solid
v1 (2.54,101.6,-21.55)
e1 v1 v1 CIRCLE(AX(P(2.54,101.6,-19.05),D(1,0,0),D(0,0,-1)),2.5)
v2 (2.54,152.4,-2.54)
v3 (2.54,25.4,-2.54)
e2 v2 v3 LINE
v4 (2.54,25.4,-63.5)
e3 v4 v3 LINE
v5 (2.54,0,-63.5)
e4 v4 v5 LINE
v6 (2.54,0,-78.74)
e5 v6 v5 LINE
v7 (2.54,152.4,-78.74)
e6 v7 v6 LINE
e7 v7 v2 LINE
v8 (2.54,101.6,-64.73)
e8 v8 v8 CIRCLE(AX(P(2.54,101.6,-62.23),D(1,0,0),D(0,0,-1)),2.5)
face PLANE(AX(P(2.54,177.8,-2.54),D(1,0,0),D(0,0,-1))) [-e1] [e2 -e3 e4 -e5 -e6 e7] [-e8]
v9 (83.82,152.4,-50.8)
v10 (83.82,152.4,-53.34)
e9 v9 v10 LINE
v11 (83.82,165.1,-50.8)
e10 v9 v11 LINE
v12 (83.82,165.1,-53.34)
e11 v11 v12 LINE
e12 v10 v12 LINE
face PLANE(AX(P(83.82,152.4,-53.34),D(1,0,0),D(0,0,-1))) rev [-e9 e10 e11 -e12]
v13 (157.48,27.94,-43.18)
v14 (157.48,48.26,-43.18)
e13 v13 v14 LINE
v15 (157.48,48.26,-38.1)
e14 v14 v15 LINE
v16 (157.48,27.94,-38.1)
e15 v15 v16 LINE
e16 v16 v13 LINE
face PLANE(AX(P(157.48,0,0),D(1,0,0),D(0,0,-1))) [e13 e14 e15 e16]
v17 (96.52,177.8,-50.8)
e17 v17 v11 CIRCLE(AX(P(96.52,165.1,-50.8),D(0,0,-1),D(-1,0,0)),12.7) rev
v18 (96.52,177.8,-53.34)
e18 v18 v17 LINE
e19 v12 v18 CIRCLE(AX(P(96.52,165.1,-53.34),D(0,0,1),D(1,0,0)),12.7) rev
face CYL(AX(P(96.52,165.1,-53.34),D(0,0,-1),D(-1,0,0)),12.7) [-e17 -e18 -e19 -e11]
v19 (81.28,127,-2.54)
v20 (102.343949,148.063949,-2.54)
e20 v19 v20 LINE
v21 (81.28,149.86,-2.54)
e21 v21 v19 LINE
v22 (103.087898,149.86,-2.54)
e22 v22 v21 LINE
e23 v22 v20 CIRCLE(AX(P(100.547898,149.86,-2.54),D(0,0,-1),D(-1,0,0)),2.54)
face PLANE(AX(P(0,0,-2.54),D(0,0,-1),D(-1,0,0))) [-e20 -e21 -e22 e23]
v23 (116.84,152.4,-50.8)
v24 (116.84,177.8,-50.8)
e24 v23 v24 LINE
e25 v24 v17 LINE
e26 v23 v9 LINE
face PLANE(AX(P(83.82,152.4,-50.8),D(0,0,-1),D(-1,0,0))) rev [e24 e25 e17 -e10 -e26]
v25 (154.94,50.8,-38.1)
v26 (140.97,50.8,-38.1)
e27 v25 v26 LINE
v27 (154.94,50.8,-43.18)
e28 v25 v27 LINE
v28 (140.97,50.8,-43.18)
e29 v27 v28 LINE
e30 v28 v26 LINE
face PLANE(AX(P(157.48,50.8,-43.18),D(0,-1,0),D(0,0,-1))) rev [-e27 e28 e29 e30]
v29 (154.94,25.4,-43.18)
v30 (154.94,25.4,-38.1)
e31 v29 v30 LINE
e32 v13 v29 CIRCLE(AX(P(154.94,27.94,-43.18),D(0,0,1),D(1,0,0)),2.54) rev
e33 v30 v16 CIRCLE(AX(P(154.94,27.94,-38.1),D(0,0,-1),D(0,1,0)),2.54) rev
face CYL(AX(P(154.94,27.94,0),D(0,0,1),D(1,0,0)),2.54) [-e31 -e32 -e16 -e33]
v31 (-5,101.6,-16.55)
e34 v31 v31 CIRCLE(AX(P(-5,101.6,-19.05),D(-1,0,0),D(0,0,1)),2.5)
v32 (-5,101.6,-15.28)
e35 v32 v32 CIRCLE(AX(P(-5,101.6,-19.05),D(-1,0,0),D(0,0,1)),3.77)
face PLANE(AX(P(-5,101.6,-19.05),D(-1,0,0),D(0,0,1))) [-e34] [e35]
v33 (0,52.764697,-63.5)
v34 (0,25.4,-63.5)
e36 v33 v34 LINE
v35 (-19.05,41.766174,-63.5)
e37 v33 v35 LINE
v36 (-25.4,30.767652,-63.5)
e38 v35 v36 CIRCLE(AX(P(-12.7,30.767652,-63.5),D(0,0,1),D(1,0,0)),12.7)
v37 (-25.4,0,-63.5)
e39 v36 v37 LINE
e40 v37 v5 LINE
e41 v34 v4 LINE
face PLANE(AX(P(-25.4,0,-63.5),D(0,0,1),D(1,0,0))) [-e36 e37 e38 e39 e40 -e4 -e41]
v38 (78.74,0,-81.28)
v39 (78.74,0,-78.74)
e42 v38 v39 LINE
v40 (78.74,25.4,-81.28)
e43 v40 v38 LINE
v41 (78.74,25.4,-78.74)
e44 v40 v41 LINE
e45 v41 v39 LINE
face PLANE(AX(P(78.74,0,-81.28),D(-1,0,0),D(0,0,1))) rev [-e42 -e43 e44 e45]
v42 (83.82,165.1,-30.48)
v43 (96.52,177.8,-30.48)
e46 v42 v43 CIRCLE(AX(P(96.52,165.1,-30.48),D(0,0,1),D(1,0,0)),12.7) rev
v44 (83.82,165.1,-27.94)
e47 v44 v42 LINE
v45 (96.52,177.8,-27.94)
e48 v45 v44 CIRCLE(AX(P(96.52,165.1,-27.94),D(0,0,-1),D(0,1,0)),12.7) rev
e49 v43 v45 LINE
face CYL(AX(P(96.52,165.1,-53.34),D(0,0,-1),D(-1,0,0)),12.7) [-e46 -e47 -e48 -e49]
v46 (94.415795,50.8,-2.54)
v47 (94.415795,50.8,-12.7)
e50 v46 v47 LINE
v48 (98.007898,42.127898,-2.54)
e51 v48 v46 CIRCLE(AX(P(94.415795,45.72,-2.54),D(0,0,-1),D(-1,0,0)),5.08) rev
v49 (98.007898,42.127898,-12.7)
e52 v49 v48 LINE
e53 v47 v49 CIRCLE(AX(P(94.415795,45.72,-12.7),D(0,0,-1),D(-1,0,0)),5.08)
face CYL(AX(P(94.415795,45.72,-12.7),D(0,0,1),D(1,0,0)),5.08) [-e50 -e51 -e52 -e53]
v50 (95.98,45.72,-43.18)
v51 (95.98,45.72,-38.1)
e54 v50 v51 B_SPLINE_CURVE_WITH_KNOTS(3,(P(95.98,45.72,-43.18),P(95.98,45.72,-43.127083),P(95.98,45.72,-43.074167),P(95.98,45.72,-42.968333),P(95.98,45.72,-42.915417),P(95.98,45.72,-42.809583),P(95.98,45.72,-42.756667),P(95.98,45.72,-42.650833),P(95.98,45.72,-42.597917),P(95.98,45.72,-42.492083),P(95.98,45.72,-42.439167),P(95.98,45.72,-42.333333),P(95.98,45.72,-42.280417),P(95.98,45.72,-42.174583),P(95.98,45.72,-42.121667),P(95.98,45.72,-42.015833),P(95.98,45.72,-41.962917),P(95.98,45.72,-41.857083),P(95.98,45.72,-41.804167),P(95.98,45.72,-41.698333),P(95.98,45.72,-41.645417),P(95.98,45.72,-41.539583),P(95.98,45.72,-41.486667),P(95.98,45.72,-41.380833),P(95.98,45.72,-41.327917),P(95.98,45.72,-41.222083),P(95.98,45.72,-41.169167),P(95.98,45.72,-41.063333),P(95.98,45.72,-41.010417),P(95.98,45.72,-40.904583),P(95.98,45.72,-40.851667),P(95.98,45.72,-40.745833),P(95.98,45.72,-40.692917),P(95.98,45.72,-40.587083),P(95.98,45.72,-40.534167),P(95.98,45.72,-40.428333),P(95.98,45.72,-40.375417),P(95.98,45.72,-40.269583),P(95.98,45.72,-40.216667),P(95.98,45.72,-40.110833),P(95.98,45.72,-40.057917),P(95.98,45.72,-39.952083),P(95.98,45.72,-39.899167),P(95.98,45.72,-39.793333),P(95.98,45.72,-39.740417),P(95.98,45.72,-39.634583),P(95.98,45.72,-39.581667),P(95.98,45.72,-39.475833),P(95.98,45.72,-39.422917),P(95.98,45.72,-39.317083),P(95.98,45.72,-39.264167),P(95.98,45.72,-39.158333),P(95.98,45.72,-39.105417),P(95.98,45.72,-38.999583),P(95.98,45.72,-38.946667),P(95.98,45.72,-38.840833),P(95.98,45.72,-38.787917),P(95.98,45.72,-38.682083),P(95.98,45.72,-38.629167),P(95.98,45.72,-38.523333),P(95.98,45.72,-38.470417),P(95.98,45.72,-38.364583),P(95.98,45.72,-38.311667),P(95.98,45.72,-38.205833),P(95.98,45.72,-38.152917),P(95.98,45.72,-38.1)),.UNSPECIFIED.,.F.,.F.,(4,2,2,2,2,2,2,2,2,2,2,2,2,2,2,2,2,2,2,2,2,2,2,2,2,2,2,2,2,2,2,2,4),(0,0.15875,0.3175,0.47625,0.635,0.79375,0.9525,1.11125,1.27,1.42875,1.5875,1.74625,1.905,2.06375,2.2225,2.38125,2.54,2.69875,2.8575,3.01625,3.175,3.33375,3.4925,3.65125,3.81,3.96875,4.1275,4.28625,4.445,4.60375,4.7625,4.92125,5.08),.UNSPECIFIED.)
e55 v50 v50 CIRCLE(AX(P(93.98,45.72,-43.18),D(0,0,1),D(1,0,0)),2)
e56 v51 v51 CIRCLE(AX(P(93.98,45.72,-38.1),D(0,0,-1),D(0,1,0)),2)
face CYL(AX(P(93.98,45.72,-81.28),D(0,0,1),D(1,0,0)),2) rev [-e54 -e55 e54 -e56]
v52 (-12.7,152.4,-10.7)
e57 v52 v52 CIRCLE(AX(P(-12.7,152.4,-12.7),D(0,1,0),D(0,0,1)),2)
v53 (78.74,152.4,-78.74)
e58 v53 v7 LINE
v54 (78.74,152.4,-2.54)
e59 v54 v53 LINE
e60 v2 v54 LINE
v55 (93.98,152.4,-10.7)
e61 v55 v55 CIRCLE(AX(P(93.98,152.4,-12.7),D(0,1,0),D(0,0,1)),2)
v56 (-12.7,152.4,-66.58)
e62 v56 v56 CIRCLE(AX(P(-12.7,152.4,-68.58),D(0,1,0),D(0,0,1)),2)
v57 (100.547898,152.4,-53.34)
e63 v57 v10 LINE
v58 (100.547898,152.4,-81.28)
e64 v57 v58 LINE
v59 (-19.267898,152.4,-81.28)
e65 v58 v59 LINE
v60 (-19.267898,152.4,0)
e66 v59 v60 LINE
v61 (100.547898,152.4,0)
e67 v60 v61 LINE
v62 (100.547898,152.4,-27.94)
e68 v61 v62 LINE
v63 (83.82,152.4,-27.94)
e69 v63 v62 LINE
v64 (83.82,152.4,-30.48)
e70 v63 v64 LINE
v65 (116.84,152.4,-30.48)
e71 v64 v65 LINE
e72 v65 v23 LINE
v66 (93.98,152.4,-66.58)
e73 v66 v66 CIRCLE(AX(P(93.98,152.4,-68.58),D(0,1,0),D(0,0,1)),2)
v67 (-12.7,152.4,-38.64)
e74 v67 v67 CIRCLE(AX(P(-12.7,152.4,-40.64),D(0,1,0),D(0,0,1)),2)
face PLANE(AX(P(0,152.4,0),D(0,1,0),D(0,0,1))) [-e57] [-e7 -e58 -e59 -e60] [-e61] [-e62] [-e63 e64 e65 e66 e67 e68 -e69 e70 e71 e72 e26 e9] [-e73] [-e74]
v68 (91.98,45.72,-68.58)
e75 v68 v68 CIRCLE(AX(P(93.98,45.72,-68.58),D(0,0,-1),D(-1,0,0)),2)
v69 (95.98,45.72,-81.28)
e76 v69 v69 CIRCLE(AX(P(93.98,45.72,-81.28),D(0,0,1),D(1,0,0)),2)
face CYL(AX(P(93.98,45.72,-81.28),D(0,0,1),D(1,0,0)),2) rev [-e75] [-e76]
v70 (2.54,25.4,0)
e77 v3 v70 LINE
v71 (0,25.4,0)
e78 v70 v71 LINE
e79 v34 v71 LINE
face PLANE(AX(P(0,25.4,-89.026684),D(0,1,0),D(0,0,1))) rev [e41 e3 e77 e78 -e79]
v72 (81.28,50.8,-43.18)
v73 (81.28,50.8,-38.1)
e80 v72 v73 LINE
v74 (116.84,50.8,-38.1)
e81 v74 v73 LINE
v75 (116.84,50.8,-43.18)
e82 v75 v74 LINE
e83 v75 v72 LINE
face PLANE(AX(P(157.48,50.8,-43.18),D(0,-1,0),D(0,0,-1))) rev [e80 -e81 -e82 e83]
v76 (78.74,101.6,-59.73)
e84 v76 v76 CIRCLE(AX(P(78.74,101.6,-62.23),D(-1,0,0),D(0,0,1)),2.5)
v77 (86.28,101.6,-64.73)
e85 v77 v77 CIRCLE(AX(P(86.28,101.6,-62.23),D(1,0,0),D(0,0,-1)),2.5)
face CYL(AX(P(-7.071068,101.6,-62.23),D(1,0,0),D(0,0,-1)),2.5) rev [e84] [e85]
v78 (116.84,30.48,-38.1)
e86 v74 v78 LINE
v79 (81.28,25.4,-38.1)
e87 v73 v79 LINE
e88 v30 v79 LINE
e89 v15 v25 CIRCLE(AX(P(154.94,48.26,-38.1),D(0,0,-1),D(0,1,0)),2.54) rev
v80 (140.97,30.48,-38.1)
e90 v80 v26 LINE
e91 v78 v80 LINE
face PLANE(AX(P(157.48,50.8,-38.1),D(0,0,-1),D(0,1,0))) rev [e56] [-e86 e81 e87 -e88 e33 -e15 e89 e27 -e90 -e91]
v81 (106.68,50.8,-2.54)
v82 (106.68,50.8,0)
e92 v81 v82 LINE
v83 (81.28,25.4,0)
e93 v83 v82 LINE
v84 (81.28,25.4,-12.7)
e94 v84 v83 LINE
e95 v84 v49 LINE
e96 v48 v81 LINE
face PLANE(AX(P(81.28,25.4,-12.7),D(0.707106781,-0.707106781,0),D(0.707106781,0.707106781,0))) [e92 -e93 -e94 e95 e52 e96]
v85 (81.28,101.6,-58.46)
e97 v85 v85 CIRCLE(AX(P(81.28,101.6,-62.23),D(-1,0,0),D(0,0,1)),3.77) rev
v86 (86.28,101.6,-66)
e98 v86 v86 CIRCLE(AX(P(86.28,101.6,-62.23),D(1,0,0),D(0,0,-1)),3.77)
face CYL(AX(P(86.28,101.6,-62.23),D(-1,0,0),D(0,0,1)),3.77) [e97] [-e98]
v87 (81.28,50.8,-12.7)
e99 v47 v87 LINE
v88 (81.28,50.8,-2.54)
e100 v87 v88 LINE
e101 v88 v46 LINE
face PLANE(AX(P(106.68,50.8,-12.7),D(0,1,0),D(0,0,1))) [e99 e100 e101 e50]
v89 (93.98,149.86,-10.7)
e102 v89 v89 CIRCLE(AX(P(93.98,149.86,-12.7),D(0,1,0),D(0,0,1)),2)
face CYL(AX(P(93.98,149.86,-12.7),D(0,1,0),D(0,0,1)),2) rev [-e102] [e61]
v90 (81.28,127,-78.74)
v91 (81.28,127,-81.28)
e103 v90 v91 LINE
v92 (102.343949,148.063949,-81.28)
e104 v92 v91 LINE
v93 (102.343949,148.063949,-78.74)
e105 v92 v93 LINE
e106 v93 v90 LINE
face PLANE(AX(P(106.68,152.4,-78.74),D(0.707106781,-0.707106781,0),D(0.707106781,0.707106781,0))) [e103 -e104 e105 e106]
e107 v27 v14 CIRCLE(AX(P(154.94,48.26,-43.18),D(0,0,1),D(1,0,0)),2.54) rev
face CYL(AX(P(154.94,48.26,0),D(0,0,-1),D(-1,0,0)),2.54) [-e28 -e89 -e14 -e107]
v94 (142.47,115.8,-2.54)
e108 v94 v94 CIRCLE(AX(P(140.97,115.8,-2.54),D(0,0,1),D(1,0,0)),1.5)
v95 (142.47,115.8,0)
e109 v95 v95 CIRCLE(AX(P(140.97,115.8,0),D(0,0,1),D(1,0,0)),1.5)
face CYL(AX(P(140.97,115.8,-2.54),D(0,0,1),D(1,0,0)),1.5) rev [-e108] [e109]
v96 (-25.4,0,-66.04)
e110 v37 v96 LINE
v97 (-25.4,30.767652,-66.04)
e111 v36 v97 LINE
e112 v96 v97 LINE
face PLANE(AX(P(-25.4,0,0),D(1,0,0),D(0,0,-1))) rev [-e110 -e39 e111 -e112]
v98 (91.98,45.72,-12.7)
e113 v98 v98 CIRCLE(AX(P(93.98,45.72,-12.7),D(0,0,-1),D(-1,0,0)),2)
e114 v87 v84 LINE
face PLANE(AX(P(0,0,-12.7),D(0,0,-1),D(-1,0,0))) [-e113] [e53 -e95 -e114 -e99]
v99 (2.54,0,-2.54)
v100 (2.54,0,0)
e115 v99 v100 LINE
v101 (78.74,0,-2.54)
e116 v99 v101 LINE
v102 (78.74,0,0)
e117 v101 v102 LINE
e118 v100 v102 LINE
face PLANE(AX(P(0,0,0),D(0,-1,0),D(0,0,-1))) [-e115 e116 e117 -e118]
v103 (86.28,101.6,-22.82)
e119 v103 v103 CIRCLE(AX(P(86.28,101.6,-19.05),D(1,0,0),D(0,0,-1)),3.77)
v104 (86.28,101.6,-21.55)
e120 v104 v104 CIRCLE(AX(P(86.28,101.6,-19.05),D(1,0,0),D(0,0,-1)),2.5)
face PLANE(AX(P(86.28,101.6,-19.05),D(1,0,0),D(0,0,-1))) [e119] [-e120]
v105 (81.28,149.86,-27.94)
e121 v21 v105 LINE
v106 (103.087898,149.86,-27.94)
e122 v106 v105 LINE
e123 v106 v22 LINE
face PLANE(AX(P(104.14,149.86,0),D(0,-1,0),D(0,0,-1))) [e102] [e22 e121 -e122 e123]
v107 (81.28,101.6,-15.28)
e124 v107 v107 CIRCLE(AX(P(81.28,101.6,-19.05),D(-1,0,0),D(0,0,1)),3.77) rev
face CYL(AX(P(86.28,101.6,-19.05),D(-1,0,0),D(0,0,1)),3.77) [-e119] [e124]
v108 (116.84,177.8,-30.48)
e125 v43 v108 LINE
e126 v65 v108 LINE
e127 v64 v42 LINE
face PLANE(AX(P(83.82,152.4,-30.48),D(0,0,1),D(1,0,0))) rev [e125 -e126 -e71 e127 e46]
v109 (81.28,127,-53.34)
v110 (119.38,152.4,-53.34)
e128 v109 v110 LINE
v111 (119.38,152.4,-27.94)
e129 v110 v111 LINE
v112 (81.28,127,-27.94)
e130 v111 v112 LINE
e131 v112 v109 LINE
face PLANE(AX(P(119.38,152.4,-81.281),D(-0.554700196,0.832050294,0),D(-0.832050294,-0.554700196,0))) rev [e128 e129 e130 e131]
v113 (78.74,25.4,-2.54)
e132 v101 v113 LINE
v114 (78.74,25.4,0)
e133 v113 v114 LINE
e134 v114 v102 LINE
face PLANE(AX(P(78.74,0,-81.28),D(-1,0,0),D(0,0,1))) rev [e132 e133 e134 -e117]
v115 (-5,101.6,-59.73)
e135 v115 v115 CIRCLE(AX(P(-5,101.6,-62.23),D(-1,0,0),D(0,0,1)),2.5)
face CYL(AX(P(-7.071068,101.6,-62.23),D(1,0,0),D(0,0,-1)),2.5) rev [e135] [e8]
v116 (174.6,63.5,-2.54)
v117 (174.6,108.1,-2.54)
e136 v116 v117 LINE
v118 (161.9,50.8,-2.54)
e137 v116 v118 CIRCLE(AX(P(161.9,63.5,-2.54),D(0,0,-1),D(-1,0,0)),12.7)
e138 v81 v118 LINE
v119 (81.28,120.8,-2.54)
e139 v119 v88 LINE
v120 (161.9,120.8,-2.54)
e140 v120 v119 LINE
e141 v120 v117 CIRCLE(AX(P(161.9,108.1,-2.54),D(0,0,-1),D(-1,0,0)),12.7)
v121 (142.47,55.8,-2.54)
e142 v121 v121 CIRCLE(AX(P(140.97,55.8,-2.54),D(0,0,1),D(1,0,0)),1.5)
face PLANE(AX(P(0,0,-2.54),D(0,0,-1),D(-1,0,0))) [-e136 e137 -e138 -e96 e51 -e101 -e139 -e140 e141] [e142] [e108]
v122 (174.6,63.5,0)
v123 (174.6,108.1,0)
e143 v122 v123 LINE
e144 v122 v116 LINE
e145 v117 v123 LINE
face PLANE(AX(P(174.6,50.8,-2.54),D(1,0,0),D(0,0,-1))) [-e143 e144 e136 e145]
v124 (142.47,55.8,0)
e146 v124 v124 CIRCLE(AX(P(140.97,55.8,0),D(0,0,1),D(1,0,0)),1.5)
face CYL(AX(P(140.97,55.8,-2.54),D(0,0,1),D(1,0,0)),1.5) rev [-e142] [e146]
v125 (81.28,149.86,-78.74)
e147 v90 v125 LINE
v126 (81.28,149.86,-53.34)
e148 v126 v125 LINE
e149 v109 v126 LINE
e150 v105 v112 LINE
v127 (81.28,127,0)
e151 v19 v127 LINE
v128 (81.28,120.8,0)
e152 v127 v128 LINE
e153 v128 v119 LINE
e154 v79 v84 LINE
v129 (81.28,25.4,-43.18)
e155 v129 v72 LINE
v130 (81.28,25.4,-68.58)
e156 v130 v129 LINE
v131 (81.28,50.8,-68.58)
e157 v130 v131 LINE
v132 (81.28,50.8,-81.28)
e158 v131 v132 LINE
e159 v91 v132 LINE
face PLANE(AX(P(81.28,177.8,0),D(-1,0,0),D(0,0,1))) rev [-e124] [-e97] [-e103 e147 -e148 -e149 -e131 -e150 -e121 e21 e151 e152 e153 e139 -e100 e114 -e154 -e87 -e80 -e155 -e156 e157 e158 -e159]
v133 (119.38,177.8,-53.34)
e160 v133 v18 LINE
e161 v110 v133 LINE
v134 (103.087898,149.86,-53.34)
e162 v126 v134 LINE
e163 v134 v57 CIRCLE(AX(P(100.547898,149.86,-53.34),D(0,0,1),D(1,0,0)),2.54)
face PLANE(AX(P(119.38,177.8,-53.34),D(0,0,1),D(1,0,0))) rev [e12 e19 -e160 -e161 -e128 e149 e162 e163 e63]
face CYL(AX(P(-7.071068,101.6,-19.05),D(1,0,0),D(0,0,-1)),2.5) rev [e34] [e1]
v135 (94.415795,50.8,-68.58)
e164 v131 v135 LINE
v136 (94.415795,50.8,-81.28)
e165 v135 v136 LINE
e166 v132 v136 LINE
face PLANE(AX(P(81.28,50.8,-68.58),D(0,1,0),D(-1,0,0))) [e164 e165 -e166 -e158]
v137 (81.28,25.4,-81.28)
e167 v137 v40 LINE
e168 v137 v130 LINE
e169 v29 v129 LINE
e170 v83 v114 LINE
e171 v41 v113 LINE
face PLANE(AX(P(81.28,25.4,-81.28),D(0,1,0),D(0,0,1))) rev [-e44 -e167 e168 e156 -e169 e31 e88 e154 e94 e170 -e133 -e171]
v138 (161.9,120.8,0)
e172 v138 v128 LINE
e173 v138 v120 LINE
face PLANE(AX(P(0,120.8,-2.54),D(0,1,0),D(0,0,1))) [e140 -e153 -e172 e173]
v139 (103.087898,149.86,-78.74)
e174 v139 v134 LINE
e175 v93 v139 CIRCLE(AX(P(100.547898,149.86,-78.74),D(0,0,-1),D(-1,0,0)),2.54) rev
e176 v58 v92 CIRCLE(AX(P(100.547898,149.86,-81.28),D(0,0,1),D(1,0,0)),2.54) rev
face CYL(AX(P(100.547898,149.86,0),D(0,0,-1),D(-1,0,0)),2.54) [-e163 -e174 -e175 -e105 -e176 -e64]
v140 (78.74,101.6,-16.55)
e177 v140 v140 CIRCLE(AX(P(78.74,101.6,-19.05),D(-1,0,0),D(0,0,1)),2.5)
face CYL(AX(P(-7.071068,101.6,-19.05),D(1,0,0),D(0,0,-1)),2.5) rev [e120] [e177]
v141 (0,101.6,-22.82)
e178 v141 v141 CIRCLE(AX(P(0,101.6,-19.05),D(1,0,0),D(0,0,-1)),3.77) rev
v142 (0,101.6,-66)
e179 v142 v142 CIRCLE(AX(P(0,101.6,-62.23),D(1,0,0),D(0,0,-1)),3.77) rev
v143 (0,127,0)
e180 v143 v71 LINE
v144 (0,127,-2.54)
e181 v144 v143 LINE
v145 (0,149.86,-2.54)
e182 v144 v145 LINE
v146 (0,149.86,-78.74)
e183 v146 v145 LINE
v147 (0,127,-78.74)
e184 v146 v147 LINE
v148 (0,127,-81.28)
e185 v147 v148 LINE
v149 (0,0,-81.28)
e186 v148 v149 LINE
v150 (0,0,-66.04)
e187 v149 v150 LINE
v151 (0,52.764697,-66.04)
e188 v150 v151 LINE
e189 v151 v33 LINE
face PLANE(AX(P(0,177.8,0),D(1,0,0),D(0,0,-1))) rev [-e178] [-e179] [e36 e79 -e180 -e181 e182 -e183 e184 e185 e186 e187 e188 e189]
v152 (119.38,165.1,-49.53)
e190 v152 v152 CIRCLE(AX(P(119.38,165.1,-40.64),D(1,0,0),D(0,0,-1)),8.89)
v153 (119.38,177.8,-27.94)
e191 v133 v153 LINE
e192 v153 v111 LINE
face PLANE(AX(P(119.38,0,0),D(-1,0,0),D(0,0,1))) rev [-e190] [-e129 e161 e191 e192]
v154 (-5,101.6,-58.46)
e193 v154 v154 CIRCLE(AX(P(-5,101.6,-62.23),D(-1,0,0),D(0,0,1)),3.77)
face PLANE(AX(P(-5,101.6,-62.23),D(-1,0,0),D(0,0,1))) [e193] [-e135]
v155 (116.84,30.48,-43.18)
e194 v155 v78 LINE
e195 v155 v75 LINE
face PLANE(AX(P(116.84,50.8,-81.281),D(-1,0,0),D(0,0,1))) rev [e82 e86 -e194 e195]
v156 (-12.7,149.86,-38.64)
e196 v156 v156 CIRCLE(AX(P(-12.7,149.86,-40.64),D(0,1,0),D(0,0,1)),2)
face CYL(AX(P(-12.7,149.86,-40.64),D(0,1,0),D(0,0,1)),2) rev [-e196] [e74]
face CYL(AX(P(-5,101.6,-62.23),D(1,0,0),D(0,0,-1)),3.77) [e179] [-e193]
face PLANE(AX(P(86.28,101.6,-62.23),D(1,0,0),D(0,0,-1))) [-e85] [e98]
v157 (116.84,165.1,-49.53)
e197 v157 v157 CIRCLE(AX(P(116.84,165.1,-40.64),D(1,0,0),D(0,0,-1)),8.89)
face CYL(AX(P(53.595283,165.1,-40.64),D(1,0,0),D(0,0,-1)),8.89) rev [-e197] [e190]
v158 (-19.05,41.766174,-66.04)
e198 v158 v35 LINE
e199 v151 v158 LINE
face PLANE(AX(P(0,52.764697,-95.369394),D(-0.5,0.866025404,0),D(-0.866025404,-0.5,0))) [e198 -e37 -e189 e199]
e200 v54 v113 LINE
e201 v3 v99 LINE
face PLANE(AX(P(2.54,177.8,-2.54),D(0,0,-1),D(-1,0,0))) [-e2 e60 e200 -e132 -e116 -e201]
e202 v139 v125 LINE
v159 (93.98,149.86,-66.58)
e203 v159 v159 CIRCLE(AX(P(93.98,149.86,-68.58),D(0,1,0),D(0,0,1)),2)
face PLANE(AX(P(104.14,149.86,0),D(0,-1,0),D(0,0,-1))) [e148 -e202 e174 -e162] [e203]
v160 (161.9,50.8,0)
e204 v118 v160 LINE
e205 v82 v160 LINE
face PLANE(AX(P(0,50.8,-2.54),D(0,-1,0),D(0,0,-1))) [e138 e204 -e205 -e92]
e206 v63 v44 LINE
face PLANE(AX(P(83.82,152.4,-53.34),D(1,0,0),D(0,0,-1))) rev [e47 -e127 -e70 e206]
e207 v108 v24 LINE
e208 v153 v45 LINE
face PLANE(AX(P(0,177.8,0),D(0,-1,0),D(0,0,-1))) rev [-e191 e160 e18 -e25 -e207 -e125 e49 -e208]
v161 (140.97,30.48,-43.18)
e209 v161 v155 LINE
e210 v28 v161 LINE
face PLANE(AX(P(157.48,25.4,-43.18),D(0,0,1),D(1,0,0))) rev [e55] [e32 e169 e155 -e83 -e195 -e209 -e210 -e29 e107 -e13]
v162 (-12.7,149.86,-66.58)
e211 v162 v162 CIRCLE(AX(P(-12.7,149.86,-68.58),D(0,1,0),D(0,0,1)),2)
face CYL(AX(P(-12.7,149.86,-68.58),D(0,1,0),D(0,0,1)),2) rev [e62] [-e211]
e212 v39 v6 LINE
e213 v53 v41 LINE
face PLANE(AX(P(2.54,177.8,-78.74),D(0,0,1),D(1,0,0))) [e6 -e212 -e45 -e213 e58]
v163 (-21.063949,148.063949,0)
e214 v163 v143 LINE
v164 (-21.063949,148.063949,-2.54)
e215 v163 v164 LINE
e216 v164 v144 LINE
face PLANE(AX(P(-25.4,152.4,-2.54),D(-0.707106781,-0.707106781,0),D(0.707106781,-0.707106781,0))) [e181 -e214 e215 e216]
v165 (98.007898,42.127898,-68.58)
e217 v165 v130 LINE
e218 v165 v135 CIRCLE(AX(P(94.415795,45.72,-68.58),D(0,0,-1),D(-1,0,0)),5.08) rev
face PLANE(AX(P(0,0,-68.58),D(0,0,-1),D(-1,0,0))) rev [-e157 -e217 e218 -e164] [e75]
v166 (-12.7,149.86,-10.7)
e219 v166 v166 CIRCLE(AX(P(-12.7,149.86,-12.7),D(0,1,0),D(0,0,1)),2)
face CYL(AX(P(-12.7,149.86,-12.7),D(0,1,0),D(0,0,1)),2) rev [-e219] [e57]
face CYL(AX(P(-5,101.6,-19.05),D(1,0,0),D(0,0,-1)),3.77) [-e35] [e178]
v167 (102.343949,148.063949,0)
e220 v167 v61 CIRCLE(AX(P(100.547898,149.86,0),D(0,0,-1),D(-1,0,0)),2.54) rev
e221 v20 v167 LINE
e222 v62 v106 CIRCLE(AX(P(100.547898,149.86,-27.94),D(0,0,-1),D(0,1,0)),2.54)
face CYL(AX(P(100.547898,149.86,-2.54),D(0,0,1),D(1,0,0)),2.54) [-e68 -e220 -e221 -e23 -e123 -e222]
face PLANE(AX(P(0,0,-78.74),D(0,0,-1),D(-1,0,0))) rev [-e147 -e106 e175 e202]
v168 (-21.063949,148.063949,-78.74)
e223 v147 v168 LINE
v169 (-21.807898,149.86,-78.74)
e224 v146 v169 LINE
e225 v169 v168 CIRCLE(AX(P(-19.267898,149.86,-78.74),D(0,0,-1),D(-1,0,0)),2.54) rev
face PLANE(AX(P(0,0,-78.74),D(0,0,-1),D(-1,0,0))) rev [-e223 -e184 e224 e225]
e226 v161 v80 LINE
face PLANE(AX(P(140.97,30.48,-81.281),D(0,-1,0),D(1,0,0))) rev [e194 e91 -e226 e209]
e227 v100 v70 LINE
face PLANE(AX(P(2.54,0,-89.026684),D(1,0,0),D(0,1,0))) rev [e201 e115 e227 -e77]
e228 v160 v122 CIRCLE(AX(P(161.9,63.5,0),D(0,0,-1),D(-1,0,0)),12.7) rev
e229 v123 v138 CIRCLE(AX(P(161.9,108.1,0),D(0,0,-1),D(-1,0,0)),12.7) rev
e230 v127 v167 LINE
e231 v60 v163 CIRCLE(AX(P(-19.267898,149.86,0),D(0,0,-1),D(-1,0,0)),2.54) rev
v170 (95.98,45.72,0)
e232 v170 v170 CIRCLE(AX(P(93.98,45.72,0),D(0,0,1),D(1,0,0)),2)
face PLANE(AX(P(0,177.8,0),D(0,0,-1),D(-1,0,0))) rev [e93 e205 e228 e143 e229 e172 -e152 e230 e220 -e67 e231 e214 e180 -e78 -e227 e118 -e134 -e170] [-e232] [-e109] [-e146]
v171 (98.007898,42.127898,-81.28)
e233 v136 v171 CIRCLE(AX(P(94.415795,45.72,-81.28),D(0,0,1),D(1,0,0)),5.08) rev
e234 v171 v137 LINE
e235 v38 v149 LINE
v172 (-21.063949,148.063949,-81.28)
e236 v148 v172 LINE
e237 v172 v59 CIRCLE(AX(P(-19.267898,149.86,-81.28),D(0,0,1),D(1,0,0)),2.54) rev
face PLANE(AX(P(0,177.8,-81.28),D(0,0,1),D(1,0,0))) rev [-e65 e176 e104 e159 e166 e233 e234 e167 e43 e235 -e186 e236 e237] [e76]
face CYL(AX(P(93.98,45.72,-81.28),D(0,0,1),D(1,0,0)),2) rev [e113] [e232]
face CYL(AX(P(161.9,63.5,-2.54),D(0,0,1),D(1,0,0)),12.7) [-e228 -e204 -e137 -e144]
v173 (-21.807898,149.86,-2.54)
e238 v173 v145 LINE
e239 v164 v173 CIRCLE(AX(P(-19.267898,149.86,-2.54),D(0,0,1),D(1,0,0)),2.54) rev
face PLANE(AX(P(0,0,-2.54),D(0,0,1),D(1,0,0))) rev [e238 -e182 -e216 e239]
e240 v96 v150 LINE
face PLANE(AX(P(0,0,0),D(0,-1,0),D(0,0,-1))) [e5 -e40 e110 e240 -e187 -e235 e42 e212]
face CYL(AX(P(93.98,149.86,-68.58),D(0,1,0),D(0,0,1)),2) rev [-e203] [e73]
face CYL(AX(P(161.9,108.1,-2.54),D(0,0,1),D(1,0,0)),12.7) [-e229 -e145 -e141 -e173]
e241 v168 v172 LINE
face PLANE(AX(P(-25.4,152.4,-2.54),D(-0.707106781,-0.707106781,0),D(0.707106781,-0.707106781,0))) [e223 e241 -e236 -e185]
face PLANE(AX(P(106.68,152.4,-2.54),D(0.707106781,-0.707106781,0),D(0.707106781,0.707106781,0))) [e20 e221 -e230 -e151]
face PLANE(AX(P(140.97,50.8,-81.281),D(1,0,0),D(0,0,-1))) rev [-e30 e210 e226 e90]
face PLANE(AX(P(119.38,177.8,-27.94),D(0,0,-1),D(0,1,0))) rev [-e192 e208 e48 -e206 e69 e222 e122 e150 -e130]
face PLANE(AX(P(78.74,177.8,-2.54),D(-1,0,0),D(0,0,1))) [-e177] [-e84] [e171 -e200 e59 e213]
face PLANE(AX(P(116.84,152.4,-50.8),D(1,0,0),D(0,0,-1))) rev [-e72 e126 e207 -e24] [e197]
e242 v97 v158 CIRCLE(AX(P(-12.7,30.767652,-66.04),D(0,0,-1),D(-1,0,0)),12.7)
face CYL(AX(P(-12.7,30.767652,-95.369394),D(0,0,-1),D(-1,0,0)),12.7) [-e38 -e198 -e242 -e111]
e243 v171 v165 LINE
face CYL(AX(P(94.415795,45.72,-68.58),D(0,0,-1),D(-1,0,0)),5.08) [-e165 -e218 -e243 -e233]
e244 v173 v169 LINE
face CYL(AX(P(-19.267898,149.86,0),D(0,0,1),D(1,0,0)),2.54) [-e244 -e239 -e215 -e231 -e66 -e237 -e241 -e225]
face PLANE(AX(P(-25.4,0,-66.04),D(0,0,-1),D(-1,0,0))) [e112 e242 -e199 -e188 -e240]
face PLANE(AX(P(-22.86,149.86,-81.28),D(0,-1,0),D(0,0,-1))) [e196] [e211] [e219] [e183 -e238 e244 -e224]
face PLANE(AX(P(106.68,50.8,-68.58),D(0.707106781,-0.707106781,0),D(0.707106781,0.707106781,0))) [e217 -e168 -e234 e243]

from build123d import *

# Parameters (mm, degrees)
SKETCH1_W            = 81.28
SKETCH1_H            = 81.28
SKETCH1_W_2          = 76.2
SKETCH1_H_2          = 76.2
BOSS_EXTRUDE1_DEPTH  = 177.8
SKETCH2_W            = 2.54
SKETCH2_H            = 38.1
BOSS_EXTRUDE2_DEPTH  = 25.4
SKETCH3_W            = 2.54
SKETCH3_H            = 25.4
CUT_EXTRUDE1_DEPTH   = 212.720846399
BOSS_EXTRUDE3_DEPTH  = 12.7
BOSS_EXTRUDE4_DEPTH  = 12.7
SKETCH14_W           = 5.08
SKETCH14_H           = 25.4
BOSS_EXTRUDE6_DEPTH  = 76.2
CUT_EXTRUDE2_REACH   = 243.407
SKETCH16_W           = 24.13
SKETCH16_H           = 20.32
SKETCH22_R           = 2
CUT_EXTRUDE6_DEPTH   = 252.036309724
SKETCH28_W           = 25.4
SKETCH28_H           = 50.8
BOSS_EXTRUDE7_DEPTH  = 38.1
CUT_EXTRUDE8_REACH   = 245.43
SKETCH32_W           = 33.02
SKETCH32_H           = 20.32
CUT_EXTRUDE9_DEPTH   = 25.4
CUT_EXTRUDE13_REACH  = 245.27
SKETCH34_R           = 8.89
BOSS_EXTRUDE9_DEPTH  = 2.54
SKETCH38_W           = 2.54
SKETCH38_H           = 25.4
CUT_EXTRUDE15_DEPTH  = 63.5
CUT_EXTRUDE17_REACH  = 224.71
SKETCH40_R           = 2.5
BOSS_EXTRUDE10_START = 5
SKETCH41_R           = 3.77
SKETCH41_R_2         = 2.5
BOSS_EXTRUDE10_DEPTH = 5
SKETCH42_R           = 3.77
SKETCH42_R_2         = 2.5
BOSS_EXTRUDE11_DEPTH = 5
SKETCH43_W           = 76.2
SKETCH43_H           = 76.2
CUT_EXTRUDE20_DEPTH  = 25.4
SKETCH44_W           = 174.6
SKETCH44_H           = 70
SKETCH44_R           = 1.5
BOSS_EXTRUDE12_DEPTH = 2.54
BOSS_EXTRUDE13_DEPTH = 2.54
BOSS_EXTRUDE14_DEPTH = 2.54
BOSS_EXTRUDE15_REACH = 264.115
BOSS_EXTRUDE16_DEPTH = 2.54
BOSS_EXTRUDE17_DEPTH = 2.54
BOSS_EXTRUDE18_REACH = 264.115
SKETCH51_R           = 2
CUT_EXTRUDE21_DEPTH  = 2.54
FILLET1_R            = 5.08
FILLET2_R            = 12.7
FILLET3_R            = 2.54
FILLET4_R            = 2.54
FILLET5_R            = 2.54
FILLET7_R            = 12.7
FILLET9_R            = 12.7


with BuildPart() as part:
    # Sketch1 → Boss-Extrude1 (new body)
    with BuildSketch(Plane(origin=(0, 0, 0), x_dir=(1, 0, 0), z_dir=(0, 1, 0))):
        with Locations((40.64, 40.64)):
            Rectangle(SKETCH1_W, SKETCH1_H)
        with Locations((40.64, 40.64)):
            Rectangle(SKETCH1_W_2, SKETCH1_H_2, mode=Mode.SUBTRACT)
    extrude(amount=BOSS_EXTRUDE1_DEPTH)

    # Sketch2 → Boss-Extrude2 (add)
    with BuildSketch(Plane(origin=(0, 0, 0), x_dir=(0, 0, -1), z_dir=(1, 0, 0))):
        with Locations((64.77, 19.05)):
            Rectangle(SKETCH2_W, SKETCH2_H)
    extrude(amount=-BOSS_EXTRUDE2_DEPTH)

    # Sketch3 → Cut-Extrude1 (cut, through all)
    with BuildSketch(Plane.XY):
        with Locations((80.01, 12.7)):
            Rectangle(SKETCH3_W, SKETCH3_H)
    extrude(amount=-CUT_EXTRUDE1_DEPTH, mode=Mode.SUBTRACT)

    # Sketch7 → Boss-Extrude3 (add)
    with BuildSketch(Plane.XY):
        Polygon((81.28, 25.4), (106.68, 50.8), (81.28, 50.8), align=None)
    extrude(amount=-BOSS_EXTRUDE3_DEPTH)

    # Sketch10 → Boss-Extrude4 (add)
    with BuildSketch(Plane(origin=(0, 0, -81.28), x_dir=(-1, 0, 0), z_dir=(0, 0, -1))):
        Polygon((-81.28, 25.4), (-81.28, 50.8), (-106.68, 50.8), align=None)
    extrude(amount=-BOSS_EXTRUDE4_DEPTH)

    # Sketch14 → Boss-Extrude6 (add)
    with BuildSketch(Plane(origin=(81.28, 0, 0), x_dir=(0, 0, -1), z_dir=(1, 0, 0))):
        with Locations((40.64, 38.1)):
            Rectangle(SKETCH14_W, SKETCH14_H)
    extrude(amount=BOSS_EXTRUDE6_DEPTH)

    # Sketch16 → Cut-Extrude2 (cut, up to next)
    with BuildSketch(Plane.XY.offset(-38.1), mode=Mode.PRIVATE) as cut_extrude2_sk1:
        with Locations((128.905, 40.64)):
            Rectangle(SKETCH16_W, SKETCH16_H)
    cut_extrude2_tool1 = extrude(cut_extrude2_sk1.sketch, amount=-CUT_EXTRUDE2_REACH, mode=Mode.PRIVATE) & part.part
    add(cut_extrude2_tool1.solids().sort_by_distance((128.905, 40.64, -38.1))[0], mode=Mode.SUBTRACT)

    # Sketch22 → Cut-Extrude6 (cut, through all)
    with BuildSketch(Plane.XY):
        with Locations((93.98, 45.72)):
            Circle(SKETCH22_R)
    extrude(amount=-CUT_EXTRUDE6_DEPTH, mode=Mode.SUBTRACT)

    # Sketch28 → Boss-Extrude7 (add)
    with BuildSketch(Plane(origin=(81.28, 0, 0), x_dir=(0, 0, -1), z_dir=(1, 0, 0))):
        with Locations((40.64, 152.4)):
            Rectangle(SKETCH28_W, SKETCH28_H)
    extrude(amount=BOSS_EXTRUDE7_DEPTH)

    # Sketch30 → Cut-Extrude8 (cut, up to next)
    with BuildSketch(Plane.XY.offset(-27.94), mode=Mode.PRIVATE) as cut_extrude8_sk1:
        Polygon((81.28, 127), (119.38, 127), (119.38, 152.4), align=None)
    cut_extrude8_tool1 = extrude(cut_extrude8_sk1.sketch, amount=-CUT_EXTRUDE8_REACH, mode=Mode.PRIVATE) & part.part
    add(cut_extrude8_tool1.solids().sort_by_distance((106.68, 135.466667, -27.94))[0], mode=Mode.SUBTRACT)

    # Sketch32 → Cut-Extrude9 (cut)
    with BuildSketch(Plane(origin=(0, 177.8, 0), x_dir=(1, 0, 0), z_dir=(0, 1, 0))):
        with Locations((100.33, 40.64)):
            Rectangle(SKETCH32_W, SKETCH32_H)
    extrude(amount=-CUT_EXTRUDE9_DEPTH, mode=Mode.SUBTRACT)

    # Cut-Extrude13: up to this face of the body (flat: up to its plane)
    cut_extrude13_end = Plane(part.part.faces().sort_by_distance((78.74, 101.6, -40.64))[0])
    # Sketch34 → Cut-Extrude13 (cut, up to the picked face)
    with BuildSketch(Plane(origin=(119.38, 0, 0), x_dir=(0, 0, -1), z_dir=(1, 0, 0)), mode=Mode.PRIVATE) as cut_extrude13_sk1:
        with Locations(Location((40.64, 165.1, 0), (0, 0, 180))):
            Circle(SKETCH34_R)
    cut_extrude13_tool1 = split(extrude(cut_extrude13_sk1.sketch, amount=-CUT_EXTRUDE13_REACH, mode=Mode.PRIVATE), bisect_by=cut_extrude13_end, keep=Keep.BOTH, mode=Mode.PRIVATE)
    add(cut_extrude13_tool1.solids().sort_by(Axis((119.38, 165.1, -40.64), (-1, 0, 0)))[0], mode=Mode.SUBTRACT)

    # Sketch37 → Boss-Extrude9 (add)
    with BuildSketch(Plane.XY.offset(-63.5)):
        Polygon((-25.4, 38.1), (0, 38.1), (0, 52.764696837), align=None)
    extrude(amount=-BOSS_EXTRUDE9_DEPTH)

    # Sketch38 → Cut-Extrude15 (cut)
    with BuildSketch(Plane.XY):
        with Locations((1.27, 12.7)):
            Rectangle(SKETCH38_W, SKETCH38_H)
    extrude(amount=-CUT_EXTRUDE15_DEPTH, mode=Mode.SUBTRACT)

    # Cut-Extrude17: up to this face of the body (flat: up to its plane)
    cut_extrude17_end = Plane(part.part.faces().sort_by_distance((0, 99.23335202, -41.514066738))[0])
    # Sketch40 → Cut-Extrude17 (cut, up to the picked face)
    with BuildSketch(Plane(origin=(81.28, 0, 0), x_dir=(0, 0, -1), z_dir=(1, 0, 0)), mode=Mode.PRIVATE) as cut_extrude17_sk1:
        with Locations((19.05, 101.6)):
            Circle(SKETCH40_R)
    cut_extrude17_tool1 = split(extrude(cut_extrude17_sk1.sketch, amount=-CUT_EXTRUDE17_REACH, mode=Mode.PRIVATE), bisect_by=cut_extrude17_end, keep=Keep.BOTH, mode=Mode.PRIVATE)
    # Sketch40 → Cut-Extrude17 (cut, up to the picked face)
    with BuildSketch(Plane(origin=(81.28, 0, 0), x_dir=(0, 0, -1), z_dir=(1, 0, 0)), mode=Mode.PRIVATE) as cut_extrude17_sk2:
        with Locations((62.23, 101.6)):
            Circle(SKETCH40_R)
    cut_extrude17_tool2 = split(extrude(cut_extrude17_sk2.sketch, amount=-CUT_EXTRUDE17_REACH, mode=Mode.PRIVATE), bisect_by=cut_extrude17_end, keep=Keep.BOTH, mode=Mode.PRIVATE)
    add(cut_extrude17_tool1.solids().sort_by(Axis((81.28, 101.6, -19.05), (-1, 0, 0)))[0], mode=Mode.SUBTRACT)
    add(cut_extrude17_tool2.solids().sort_by(Axis((81.28, 101.6, -62.23), (-1, 0, 0)))[0], mode=Mode.SUBTRACT)

    # Sketch41 → Boss-Extrude10 (add)
    # profile 1 of 2: a face of its own
    with BuildSketch(Plane(origin=(81.28, 0, 0), x_dir=(0, 0, -1), z_dir=(1, 0, 0)).offset(BOSS_EXTRUDE10_START)):
        with Locations(Location((19.05, 101.6, 0), (0, 0, 180))):
            Circle(SKETCH41_R)
        with Locations((19.05, 101.6)):
            Circle(SKETCH41_R_2, mode=Mode.SUBTRACT)
    # profile 2 of 2: a face of its own
    with BuildSketch(Plane(origin=(81.28, 0, 0), x_dir=(0, 0, -1), z_dir=(1, 0, 0)).offset(BOSS_EXTRUDE10_START)):
        with Locations(Location((62.23, 101.6, 0), (0, 0, 180))):
            Circle(SKETCH41_R)
        with Locations((62.23, 101.6)):
            Circle(SKETCH41_R_2, mode=Mode.SUBTRACT)
    extrude(amount=-BOSS_EXTRUDE10_DEPTH)

    # Sketch42 → Boss-Extrude11 (add)
    # profile 1 of 2: a face of its own
    with BuildSketch(Plane.ZY):
        with Locations((-62.23, 101.6)):
            Circle(SKETCH42_R)
        with Locations(Location((-62.23, 101.6, 0), (0, 0, 180))):
            Circle(SKETCH42_R_2, mode=Mode.SUBTRACT)
    # profile 2 of 2: a face of its own
    with BuildSketch(Plane.ZY):
        with Locations((-19.05, 101.6)):
            Circle(SKETCH42_R)
        with Locations(Location((-19.05, 101.6, 0), (0, 0, 180))):
            Circle(SKETCH42_R_2, mode=Mode.SUBTRACT)
    extrude(amount=BOSS_EXTRUDE11_DEPTH)

    # Sketch43 → Cut-Extrude20 (cut)
    with BuildSketch(Plane(origin=(0, 177.8, 0), x_dir=(1, 0, 0), z_dir=(0, 1, 0))):
        Polygon((83.82, 53.34), (83.82, 27.94), (81.28, 27.94), (81.28, 0), (0, 0), (0, 81.28), (81.28, 81.28), (81.28, 53.34), align=None)
        with Locations((40.64, 40.64)):
            Rectangle(SKETCH43_W, SKETCH43_H, mode=Mode.SUBTRACT)
    extrude(amount=-CUT_EXTRUDE20_DEPTH, mode=Mode.SUBTRACT)

    # Sketch44 → Boss-Extrude12 (add)
    with BuildSketch(Plane.XY):
        with Locations((87.3, 85.8)):
            Rectangle(SKETCH44_W, SKETCH44_H)
        with Locations((140.97, 115.8)):
            Circle(SKETCH44_R, mode=Mode.SUBTRACT)
        with Locations((140.97, 55.8)):
            Circle(SKETCH44_R, mode=Mode.SUBTRACT)
    extrude(amount=-BOSS_EXTRUDE12_DEPTH)

    # Sketch45 → Boss-Extrude13 (add)
    with BuildSketch(Plane.XY):
        Polygon((0, 152.4), (-25.4, 152.4), (0, 127), align=None)
    extrude(amount=-BOSS_EXTRUDE13_DEPTH)

    # Sketch46 → Boss-Extrude14 (add)
    with BuildSketch(Plane(origin=(0, 0, -81.28), x_dir=(-1, 0, 0), z_dir=(0, 0, -1))):
        Polygon((0, 152.4), (0, 127), (25.4, 152.4), align=None)
    extrude(amount=-BOSS_EXTRUDE14_DEPTH)

    # Sketch47 → Boss-Extrude15 (add, up to next)
    with BuildSketch(Plane.XY, mode=Mode.PRIVATE) as boss_extrude15_sk1:
        Polygon((0, 152.4), (-25.4, 152.4), (-22.86, 149.86), (0, 149.86), align=None)
    boss_extrude15_tool1 = extrude(boss_extrude15_sk1.sketch, amount=-BOSS_EXTRUDE15_REACH, mode=Mode.PRIVATE) - part.part
    add(boss_extrude15_tool1.solids().sort_by_distance((-12.07614, 151.152281, 0))[0])

    # Sketch48 → Boss-Extrude16 (add)
    with BuildSketch(Plane.XY):
        Polygon((81.28, 152.4), (106.68, 152.4), (81.28, 127), align=None)
    extrude(amount=-BOSS_EXTRUDE16_DEPTH)

    # Sketch49 → Boss-Extrude17 (add)
    with BuildSketch(Plane(origin=(0, 0, -81.28), x_dir=(-1, 0, 0), z_dir=(0, 0, -1))):
        Polygon((-81.28, 152.4), (-106.68, 152.4), (-81.28, 127), align=None)
    extrude(amount=-BOSS_EXTRUDE17_DEPTH)

    # Sketch50 → Boss-Extrude18 (add, up to next)
    with BuildSketch(Plane(origin=(0, 0, -81.28), x_dir=(-1, 0, 0), z_dir=(0, 0, -1)), mode=Mode.PRIVATE) as boss_extrude18_sk1:
        Polygon((-81.28, 152.4), (-106.68, 152.4), (-104.14, 149.86), (-81.28, 149.86), align=None)
    boss_extrude18_tool1 = extrude(boss_extrude18_sk1.sketch, amount=-BOSS_EXTRUDE18_REACH, mode=Mode.PRIVATE) - part.part
    add(boss_extrude18_tool1.solids().sort_by_distance((93.35614, 151.152281, -81.28))[0])
    add(boss_extrude18_tool1.solids().sort_by_distance((93.35614, 151.152281, -81.28))[1])

    # Sketch51 → Cut-Extrude21 (cut)
    with BuildSketch(Plane(origin=(0, 152.4, 0), x_dir=(1, 0, 0), z_dir=(0, 1, 0))):
        with Locations(Location((-12.7, 68.58, 0), (0, 0, 270))):
            Circle(SKETCH51_R)
        with Locations(Location((-12.7, 40.64, 0), (0, 0, 270))):
            Circle(SKETCH51_R)
        with Locations(Location((-12.7, 12.7, 0), (0, 0, 270))):
            Circle(SKETCH51_R)
        with Locations(Location((93.98, 68.58, 0), (0, 0, 270))):
            Circle(SKETCH51_R)
        with Locations(Location((93.98, 12.7, 0), (0, 0, 270))):
            Circle(SKETCH51_R)
    extrude(amount=-CUT_EXTRUDE21_DEPTH, mode=Mode.SUBTRACT)

    # Fillet1
    fillet1_edges = [part.edges().sort_by_distance(p)[0] for p in [
        (106.68, 50.8, -7.62),
        (106.68, 50.8, -74.93),
    ]]
    fillet(fillet1_edges, radius=FILLET1_R)

    # Fillet2
    fillet2_edges = [part.edges().sort_by_distance(p)[0] for p in [
        (174.6, 120.8, -1.27),
        (174.6, 50.8, -1.27),
    ]]
    fillet(fillet2_edges, radius=FILLET2_R)

    # Fillet3
    fillet3_edges = [part.edges().sort_by_distance(p)[0] for p in [
        (157.48, 50.8, -40.64),
        (157.48, 25.4, -40.64),
    ]]
    fillet(fillet3_edges, radius=FILLET3_R)

    # Fillet4
    # the kernel refuses this fillet: 2.54 mm, written as the material it takes off along each edge
    with BuildSketch(Plane(origin=(-25.4, 152.4, 15.330256121), x_dir=(1, 0, 0), z_dir=(0, 0, -1))) as fillet4_piece_1:
        with BuildLine():
            CenterArc((FILLET4_R * 2.41421356237, FILLET4_R), FILLET4_R, 135, 135)
            Line((FILLET4_R * 1.70710678119, FILLET4_R * 1.70710678119), (0, 0))
            Line((0, 0), (FILLET4_R * 2.41421356237, 0))
        make_face()
    extrude(amount=111.940512242, mode=Mode.SUBTRACT)

    # Fillet5
    fillet5_edges = [part.edges().sort_by_distance(p)[0] for p in [
        (106.68, 152.4, -67.31),
        (106.68, 152.4, -13.97),
    ]]
    fillet(fillet5_edges, radius=FILLET5_R)

    # Fillet7
    fillet7_edges = [part.edges().sort_by_distance(p)[0] for p in [
        (-25.4, 38.1, -64.77),
    ]]
    fillet(fillet7_edges, radius=FILLET7_R)

    # Fillet9
    fillet9_edges = [part.edges().sort_by_distance(p)[0] for p in [
        (83.82, 177.8, -29.21),
        (83.82, 177.8, -52.07),
    ]]
    fillet(fillet9_edges, radius=FILLET9_R)


solid = part.part
